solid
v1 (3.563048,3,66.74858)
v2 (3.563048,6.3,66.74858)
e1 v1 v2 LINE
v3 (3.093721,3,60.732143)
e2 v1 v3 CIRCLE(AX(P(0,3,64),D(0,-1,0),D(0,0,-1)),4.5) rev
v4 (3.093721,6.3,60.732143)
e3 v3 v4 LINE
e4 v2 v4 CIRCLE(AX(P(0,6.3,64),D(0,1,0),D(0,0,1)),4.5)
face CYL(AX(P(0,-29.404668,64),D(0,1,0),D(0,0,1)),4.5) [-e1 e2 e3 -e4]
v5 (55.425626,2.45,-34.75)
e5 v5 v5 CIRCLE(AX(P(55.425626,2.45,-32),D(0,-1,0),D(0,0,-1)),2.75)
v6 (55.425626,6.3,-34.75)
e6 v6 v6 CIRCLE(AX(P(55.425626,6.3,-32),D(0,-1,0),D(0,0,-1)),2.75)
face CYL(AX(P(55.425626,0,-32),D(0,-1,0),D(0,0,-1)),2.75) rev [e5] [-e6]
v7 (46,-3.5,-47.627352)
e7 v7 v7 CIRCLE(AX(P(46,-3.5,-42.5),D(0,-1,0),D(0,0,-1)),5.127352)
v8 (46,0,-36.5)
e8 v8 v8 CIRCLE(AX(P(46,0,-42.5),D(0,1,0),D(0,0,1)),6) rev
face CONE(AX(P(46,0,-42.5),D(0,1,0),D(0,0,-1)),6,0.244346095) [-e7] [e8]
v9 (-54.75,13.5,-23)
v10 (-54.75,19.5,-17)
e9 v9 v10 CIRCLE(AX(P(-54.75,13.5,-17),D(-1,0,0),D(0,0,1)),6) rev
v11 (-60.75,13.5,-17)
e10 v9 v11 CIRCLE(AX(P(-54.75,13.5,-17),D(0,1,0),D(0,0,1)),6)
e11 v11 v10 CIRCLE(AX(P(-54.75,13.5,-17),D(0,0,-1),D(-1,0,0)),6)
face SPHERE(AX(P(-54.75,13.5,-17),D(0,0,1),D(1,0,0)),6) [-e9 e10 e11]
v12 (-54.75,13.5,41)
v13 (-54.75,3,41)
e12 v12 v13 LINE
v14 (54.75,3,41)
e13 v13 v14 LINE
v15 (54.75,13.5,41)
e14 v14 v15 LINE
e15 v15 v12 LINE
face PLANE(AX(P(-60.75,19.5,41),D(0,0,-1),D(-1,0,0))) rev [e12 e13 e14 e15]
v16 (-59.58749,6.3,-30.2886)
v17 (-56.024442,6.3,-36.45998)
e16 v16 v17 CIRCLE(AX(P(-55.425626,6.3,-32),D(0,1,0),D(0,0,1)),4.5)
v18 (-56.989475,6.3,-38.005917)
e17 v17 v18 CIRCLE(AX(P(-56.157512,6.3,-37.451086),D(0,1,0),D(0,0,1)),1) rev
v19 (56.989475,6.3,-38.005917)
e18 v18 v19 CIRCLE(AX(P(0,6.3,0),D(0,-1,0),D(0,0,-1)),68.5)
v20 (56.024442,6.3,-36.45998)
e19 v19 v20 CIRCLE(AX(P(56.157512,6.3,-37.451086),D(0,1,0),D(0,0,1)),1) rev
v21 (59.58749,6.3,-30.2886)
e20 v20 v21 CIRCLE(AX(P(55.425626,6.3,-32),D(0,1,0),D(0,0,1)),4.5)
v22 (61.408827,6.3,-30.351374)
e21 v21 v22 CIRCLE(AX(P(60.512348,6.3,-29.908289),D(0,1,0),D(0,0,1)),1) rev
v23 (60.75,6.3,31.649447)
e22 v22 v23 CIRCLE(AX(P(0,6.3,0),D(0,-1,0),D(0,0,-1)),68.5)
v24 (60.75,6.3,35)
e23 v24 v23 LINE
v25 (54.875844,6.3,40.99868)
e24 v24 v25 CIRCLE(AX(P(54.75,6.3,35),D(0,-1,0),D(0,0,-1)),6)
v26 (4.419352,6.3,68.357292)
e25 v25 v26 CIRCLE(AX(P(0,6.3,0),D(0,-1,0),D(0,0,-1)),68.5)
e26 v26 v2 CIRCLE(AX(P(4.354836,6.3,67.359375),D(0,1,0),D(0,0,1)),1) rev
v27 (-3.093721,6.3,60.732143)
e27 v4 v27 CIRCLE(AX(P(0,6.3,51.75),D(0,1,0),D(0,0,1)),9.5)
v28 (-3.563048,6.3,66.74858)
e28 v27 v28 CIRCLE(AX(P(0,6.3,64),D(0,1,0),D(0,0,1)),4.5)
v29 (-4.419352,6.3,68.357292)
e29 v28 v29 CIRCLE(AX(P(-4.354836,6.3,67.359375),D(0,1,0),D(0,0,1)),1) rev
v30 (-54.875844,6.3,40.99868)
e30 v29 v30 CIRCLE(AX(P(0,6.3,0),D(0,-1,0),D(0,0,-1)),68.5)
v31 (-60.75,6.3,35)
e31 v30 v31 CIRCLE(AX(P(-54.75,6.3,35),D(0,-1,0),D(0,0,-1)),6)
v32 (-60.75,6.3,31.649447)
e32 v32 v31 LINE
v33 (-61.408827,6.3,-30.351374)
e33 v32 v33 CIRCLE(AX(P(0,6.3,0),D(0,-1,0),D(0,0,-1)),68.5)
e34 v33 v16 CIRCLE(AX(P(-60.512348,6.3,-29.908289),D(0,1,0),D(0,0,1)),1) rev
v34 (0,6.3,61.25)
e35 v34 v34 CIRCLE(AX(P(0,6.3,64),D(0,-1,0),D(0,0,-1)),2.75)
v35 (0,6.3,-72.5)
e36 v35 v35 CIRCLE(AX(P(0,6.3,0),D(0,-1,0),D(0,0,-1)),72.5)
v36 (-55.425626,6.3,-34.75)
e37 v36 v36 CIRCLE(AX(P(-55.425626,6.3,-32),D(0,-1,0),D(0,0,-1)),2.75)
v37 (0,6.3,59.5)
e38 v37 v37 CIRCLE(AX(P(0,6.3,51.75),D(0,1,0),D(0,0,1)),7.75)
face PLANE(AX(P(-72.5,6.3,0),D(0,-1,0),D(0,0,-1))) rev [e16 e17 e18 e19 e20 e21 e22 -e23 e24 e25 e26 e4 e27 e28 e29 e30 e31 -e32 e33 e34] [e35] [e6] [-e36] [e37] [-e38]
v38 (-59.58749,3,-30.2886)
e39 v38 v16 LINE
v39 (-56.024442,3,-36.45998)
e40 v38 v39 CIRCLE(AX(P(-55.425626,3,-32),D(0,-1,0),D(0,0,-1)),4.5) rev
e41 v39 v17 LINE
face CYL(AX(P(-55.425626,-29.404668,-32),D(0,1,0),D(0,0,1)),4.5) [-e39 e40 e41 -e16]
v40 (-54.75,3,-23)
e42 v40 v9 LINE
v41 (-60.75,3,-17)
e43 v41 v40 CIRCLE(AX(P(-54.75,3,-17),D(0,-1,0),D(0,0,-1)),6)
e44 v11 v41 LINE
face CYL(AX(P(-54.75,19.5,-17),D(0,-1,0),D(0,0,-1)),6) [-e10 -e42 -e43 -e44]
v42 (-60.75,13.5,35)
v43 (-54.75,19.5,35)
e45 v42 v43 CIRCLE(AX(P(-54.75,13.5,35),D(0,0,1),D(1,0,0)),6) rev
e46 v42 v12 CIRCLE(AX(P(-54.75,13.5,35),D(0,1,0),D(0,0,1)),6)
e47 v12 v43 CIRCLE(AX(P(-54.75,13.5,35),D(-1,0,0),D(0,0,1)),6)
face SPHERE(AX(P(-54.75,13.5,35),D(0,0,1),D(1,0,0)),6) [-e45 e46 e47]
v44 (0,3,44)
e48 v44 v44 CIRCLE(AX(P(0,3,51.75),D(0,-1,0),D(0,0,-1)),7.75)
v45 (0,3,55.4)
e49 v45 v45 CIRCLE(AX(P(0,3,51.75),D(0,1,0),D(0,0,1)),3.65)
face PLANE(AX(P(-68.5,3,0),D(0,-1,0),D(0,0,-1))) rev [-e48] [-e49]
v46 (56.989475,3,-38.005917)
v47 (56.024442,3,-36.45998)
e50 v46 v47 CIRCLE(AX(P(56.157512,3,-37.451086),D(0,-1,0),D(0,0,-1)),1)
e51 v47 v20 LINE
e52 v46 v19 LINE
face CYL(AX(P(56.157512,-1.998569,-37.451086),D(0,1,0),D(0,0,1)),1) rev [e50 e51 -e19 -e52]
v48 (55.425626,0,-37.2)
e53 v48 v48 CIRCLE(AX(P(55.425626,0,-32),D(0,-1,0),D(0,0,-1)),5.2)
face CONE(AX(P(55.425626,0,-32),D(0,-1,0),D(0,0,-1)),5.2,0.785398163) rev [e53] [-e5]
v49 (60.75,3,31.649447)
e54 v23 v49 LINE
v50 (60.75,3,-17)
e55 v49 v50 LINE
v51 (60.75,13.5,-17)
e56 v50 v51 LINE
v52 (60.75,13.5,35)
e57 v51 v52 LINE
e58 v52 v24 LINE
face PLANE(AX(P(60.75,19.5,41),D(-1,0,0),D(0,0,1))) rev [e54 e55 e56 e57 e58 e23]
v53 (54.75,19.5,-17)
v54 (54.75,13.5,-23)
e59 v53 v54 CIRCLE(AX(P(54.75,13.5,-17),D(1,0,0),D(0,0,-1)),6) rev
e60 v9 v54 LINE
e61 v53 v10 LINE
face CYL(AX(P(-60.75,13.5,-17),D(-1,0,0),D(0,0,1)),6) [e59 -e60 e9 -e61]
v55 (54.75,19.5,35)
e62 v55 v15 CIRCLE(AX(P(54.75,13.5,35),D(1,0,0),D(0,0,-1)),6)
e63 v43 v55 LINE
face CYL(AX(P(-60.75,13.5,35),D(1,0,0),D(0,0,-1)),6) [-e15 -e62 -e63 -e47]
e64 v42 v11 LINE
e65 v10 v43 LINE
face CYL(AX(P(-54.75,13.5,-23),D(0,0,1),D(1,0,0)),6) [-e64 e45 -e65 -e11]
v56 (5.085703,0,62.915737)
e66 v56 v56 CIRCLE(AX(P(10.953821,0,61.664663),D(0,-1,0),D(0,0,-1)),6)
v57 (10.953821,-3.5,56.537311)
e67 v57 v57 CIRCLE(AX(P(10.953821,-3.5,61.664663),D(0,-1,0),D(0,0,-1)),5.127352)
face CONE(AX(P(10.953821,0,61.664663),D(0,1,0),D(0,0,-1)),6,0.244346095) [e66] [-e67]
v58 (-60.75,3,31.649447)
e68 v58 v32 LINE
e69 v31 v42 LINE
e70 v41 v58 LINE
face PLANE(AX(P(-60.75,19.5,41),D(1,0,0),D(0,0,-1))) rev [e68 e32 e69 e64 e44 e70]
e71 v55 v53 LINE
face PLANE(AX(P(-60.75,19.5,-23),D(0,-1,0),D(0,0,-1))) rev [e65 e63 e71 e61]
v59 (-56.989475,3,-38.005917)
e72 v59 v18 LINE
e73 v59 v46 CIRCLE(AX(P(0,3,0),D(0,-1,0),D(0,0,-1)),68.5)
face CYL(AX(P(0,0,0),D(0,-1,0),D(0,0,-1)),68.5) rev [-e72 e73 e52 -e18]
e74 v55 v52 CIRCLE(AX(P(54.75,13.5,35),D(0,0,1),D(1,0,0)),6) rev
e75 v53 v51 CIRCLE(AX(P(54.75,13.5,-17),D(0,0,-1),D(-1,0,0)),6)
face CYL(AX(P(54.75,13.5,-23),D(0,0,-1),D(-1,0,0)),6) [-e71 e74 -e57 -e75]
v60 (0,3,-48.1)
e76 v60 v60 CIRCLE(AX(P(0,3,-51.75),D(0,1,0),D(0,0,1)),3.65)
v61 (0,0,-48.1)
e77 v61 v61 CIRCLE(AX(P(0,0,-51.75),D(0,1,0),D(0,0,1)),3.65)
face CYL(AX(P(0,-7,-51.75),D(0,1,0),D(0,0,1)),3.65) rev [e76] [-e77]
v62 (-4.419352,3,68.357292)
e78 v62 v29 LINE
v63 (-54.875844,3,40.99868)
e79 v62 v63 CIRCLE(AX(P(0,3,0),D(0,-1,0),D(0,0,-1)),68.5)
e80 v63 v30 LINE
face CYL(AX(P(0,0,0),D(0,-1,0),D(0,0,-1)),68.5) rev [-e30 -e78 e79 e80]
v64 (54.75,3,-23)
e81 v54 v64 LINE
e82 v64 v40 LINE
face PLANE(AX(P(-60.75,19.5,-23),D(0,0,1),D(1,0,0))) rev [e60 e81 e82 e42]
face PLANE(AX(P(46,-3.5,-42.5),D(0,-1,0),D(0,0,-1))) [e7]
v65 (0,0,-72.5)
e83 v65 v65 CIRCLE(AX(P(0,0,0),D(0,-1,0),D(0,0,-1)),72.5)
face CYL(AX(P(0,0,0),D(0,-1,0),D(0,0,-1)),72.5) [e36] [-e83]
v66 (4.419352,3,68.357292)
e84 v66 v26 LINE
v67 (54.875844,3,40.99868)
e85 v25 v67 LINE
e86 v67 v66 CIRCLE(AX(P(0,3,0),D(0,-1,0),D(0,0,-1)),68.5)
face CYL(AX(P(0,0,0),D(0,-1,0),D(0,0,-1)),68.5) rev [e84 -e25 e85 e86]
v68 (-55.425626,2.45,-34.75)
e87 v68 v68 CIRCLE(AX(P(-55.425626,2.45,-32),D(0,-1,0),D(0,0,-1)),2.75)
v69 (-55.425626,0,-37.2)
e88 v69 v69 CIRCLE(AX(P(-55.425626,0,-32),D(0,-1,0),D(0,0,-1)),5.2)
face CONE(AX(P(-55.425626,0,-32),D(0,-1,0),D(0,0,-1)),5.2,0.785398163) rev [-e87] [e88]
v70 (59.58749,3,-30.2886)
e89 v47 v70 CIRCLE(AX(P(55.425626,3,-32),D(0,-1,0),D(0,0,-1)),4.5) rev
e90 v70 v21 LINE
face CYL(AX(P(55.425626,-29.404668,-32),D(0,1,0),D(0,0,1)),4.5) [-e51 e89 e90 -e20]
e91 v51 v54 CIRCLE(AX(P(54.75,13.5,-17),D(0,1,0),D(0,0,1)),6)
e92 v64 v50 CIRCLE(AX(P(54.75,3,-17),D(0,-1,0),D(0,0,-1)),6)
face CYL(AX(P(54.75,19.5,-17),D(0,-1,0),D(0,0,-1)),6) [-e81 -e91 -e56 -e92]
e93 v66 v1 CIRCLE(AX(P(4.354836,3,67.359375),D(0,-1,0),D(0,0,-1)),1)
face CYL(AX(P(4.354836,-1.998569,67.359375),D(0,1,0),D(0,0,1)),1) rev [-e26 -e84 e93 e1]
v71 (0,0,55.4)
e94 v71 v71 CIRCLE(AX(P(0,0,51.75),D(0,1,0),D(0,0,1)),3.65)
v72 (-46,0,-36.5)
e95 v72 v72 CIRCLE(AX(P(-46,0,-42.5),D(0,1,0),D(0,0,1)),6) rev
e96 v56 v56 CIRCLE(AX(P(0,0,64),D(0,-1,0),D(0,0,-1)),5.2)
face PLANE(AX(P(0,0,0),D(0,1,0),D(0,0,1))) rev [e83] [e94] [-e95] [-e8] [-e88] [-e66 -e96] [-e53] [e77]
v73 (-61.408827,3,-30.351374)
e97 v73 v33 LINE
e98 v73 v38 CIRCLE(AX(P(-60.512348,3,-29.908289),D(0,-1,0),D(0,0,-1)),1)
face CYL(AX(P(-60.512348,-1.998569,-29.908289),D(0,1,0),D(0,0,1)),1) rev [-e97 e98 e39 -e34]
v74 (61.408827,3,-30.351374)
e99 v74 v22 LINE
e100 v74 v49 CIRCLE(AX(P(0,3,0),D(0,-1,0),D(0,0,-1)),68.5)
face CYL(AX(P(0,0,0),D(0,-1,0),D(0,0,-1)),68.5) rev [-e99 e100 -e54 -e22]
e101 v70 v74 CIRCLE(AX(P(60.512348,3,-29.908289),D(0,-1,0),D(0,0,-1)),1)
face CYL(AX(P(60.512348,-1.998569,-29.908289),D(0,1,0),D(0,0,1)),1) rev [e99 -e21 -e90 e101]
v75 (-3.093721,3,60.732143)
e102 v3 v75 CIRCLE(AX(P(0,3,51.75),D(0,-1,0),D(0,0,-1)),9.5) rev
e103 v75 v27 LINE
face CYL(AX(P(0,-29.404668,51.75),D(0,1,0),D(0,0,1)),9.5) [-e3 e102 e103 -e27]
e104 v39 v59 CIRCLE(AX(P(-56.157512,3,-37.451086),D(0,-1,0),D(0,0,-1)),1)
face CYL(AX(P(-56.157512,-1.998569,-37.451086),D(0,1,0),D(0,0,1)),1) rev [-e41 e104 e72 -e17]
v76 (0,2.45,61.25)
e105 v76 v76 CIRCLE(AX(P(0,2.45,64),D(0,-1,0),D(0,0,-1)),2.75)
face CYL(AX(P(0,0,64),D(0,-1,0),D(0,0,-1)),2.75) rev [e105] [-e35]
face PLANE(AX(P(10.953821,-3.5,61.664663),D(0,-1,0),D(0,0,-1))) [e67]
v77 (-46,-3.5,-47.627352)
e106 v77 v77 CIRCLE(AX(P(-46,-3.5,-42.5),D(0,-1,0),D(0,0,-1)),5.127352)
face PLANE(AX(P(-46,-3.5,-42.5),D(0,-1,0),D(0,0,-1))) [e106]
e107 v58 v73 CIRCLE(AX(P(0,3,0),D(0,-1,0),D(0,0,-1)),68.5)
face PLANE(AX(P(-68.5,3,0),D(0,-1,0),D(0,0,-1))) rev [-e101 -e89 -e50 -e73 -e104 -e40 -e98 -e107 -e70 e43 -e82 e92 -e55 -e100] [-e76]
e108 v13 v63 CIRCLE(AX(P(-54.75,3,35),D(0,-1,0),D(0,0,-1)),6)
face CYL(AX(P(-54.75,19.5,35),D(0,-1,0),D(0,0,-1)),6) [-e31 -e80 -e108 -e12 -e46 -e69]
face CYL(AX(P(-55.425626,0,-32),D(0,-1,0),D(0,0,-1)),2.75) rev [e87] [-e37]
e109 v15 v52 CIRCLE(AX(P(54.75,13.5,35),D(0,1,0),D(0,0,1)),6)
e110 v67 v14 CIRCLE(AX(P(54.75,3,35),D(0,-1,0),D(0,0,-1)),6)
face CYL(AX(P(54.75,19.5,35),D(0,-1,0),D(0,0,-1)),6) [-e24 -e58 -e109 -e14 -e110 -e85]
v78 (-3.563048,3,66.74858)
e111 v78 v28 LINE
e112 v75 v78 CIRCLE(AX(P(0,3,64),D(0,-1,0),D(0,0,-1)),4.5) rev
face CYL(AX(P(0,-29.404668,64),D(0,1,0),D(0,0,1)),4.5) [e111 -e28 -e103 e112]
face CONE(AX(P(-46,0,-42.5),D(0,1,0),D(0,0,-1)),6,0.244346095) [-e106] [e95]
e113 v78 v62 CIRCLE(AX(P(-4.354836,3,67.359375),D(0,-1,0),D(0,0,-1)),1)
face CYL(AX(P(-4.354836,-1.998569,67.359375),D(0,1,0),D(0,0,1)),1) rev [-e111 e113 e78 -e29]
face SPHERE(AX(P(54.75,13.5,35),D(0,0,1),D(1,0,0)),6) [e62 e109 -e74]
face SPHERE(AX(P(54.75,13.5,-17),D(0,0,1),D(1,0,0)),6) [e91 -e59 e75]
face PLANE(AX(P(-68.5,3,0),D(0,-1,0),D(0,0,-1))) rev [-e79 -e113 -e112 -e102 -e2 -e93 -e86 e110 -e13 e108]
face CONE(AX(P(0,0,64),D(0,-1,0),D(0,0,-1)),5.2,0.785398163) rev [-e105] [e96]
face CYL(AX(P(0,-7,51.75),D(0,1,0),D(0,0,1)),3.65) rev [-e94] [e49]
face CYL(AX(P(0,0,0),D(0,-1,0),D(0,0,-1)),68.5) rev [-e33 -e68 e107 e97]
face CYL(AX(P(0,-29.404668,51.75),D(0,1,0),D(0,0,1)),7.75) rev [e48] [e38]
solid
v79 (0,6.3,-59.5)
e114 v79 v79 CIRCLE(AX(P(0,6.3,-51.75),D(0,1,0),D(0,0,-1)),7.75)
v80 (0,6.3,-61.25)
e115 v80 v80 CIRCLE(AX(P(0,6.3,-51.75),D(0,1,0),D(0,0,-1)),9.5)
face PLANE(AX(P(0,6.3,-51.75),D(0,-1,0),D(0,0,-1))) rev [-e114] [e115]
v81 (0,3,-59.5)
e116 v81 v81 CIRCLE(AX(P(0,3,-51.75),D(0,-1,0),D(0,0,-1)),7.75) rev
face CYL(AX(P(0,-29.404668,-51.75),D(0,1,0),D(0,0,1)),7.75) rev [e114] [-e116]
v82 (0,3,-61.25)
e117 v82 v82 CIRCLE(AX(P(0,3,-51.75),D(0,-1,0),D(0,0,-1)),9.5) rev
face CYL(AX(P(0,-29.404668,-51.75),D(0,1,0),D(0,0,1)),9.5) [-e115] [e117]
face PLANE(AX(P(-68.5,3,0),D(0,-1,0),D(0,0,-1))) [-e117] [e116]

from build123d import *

# Parameters (mm, degrees)
ESQUISSE2_W                                 = 121.5
ESQUISSE2_H                                 = 64
BOSS_EXTRU_1_DEPTH                          = 16.5
CONG_1_R                                    = 6
ESQUISSE3_R                                 = 4.5
BOSS_EXTRU_4_DEPTH                          = 3.3
BOSS_EXTRU_4_2_DEPTH                        = 3.3
ESQUISSE3_R_2                               = 9.5
ESQUISSE3_R_3                               = 7.75
BOSS_EXTRU_4_3_DEPTH                        = 3.3
BOSS_EXTRU_4_4_DEPTH                        = 3.3
BOSS_EXTRU_5_START                          = -3.3
BOSS_EXTRU_5_DEPTH                          = 3.3
ESQUISSE5_R                                 = 3.65
ENL_V_MAT_EXTRU_1_DEPTH                     = 10
FRAISAGE_POUR_VIS_T_TE_FRAIS_E_M51_AT_COUNT = 2
FRAISAGE_POUR_VIS_T_TE_FRAIS_E_M51_AT_PITCH = 110.851251684
FRAISAGE_POUR_VIS_T_TE_FRAIS_E_M51_2_COUNT  = 2
FRAISAGE_POUR_VIS_T_TE_FRAIS_E_M51_2_PITCH  = 110.851251684
ESQUISSE8_R                                 = 6
BOSS_EXTRU_6_DEPTH                          = 3.5
BOSS_EXTRU_6_DRAFT                          = 14
BOSS_EXTRU_6_PROFILE_2_DEPTH                = 3.5
BOSS_EXTRU_6_PROFILE_2_DRAFT                = 14
BOSS_EXTRU_6_PROFILE_3_DEPTH                = 3.5
BOSS_EXTRU_6_PROFILE_3_DRAFT                = 14


with BuildPart() as part:
    # Esquisse1 → Révolution1 (revolve)
    with BuildSketch(Plane.XY, mode=Mode.PRIVATE) as r_volution1_sk:
        Polygon((0, 0), (-72.5, 0), (-72.5, 6.3), (-68.5, 6.3), (-68.5, 3), (0, 3), align=None)
    revolve(r_volution1_sk.sketch.rotate(Axis((0, 0, 0), (0, 1, 0)), 270), axis=Axis((0, 0, 0), (0, 1, 0)))

    # Esquisse2 → Boss.-Extru.1 (add)
    with BuildSketch(Plane(origin=(0, 3, 0), x_dir=(1, 0, 0), z_dir=(0, 1, 0))):
        with Locations((0, -9)):
            Rectangle(ESQUISSE2_W, ESQUISSE2_H)
    extrude(amount=BOSS_EXTRU_1_DEPTH)

    # Congé1
    # the kernel refuses this fillet: 6 mm, written as the material it takes off along each edge
    with BuildSketch(Plane(origin=(54.75, 13.5, -17), x_dir=(0, 1, 0), z_dir=(1, 0, 0))) as cong_1_piece_1_section:
        Polygon((0, 0), (CONG_1_R * 1.02, 0), (CONG_1_R * 1.02, -CONG_1_R * 1.02), (0, -CONG_1_R * 1.02), align=None)
    cong_1_piece_1 = extrude(amount=CONG_1_R * 1.02, mode=Mode.PRIVATE)
    cong_1_piece_1 = cong_1_piece_1 - Plane(origin=(54.75, 13.5, -17), x_dir=(0, -0.7071067811865475, 0.7071067811865475), z_dir=(1, 0, 0)) * Sphere(CONG_1_R, mode=Mode.PRIVATE)
    add(cong_1_piece_1, mode=Mode.SUBTRACT)
    with BuildSketch(Plane(origin=(-54.75, 13.5, -17), x_dir=(0, 0, -1), z_dir=(0, 1, 0))) as cong_1_piece_2_section:
        Polygon((0, 0), (CONG_1_R * 1.02, 0), (CONG_1_R * 1.02, CONG_1_R * 1.02), (0, CONG_1_R * 1.02), align=None)
    cong_1_piece_2 = extrude(amount=CONG_1_R * 1.02, mode=Mode.PRIVATE)
    cong_1_piece_2 = cong_1_piece_2 - Plane(origin=(-54.75, 13.5, -17), x_dir=(0.7071067811865475, 0, 0.7071067811865475), z_dir=(0, 1, 0)) * Sphere(CONG_1_R, mode=Mode.PRIVATE)
    add(cong_1_piece_2, mode=Mode.SUBTRACT)
    with BuildSketch(Plane(origin=(54.75, 13.5, 35), x_dir=(1, 0, 0), z_dir=(0, 0, 1))) as cong_1_piece_3_section:
        Polygon((0, 0), (CONG_1_R * 1.02, 0), (CONG_1_R * 1.02, CONG_1_R * 1.02), (0, CONG_1_R * 1.02), align=None)
    cong_1_piece_3 = extrude(amount=CONG_1_R * 1.02, mode=Mode.PRIVATE)
    cong_1_piece_3 = cong_1_piece_3 - Plane(origin=(54.75, 13.5, 35), x_dir=(-0.7071067811865475, -0.7071067811865475, 0), z_dir=(0, 0, 1)) * Sphere(CONG_1_R, mode=Mode.PRIVATE)
    add(cong_1_piece_3, mode=Mode.SUBTRACT)
    with BuildSketch(Plane(origin=(-54.75, 13.5, 35), x_dir=(0, 1, 0), z_dir=(0, 0, 1))) as cong_1_piece_4_section:
        Polygon((0, 0), (CONG_1_R * 1.02, 0), (CONG_1_R * 1.02, CONG_1_R * 1.02), (0, CONG_1_R * 1.02), align=None)
    cong_1_piece_4 = extrude(amount=CONG_1_R * 1.02, mode=Mode.PRIVATE)
    cong_1_piece_4 = cong_1_piece_4 - Plane(origin=(-54.75, 13.5, 35), x_dir=(0.7071067811865475, -0.7071067811865475, 0), z_dir=(0, 0, 1)) * Sphere(CONG_1_R, mode=Mode.PRIVATE)
    add(cong_1_piece_4, mode=Mode.SUBTRACT)
    with BuildSketch(Plane(origin=(54.75, 19.5, -23), x_dir=(0, 0, 1), z_dir=(-1, 0, 0)), Plane(origin=(-54.75, 19.5, 41), x_dir=(0, 0, -1), z_dir=(1, 0, 0))) as cong_1_piece_5:
        with BuildLine():
            CenterArc((CONG_1_R, -CONG_1_R), CONG_1_R, 90, 90)
            Line((0, -CONG_1_R), (0, 0))
            Line((0, 0), (CONG_1_R, 0))
        make_face()
    extrude(amount=109.5, mode=Mode.SUBTRACT)
    with BuildSketch(Plane(origin=(60.75, 19.5, 35), x_dir=(0, -1, 0), z_dir=(0, 0, -1))) as cong_1_piece_6:
        with BuildLine():
            CenterArc((CONG_1_R, CONG_1_R), CONG_1_R, 180, 90)
            Line((0, CONG_1_R), (0, 0))
            Line((0, 0), (CONG_1_R, 0))
        make_face()
    extrude(amount=52, mode=Mode.SUBTRACT)
    with BuildSketch(Plane(origin=(-60.75, 19.5, -17), x_dir=(1, 0, 0), z_dir=(0, 0, 1))) as cong_1_piece_7:
        with BuildLine():
            CenterArc((CONG_1_R, -CONG_1_R), CONG_1_R, 90, 90)
            Line((0, -CONG_1_R), (0, 0))
            Line((0, 0), (CONG_1_R, 0))
        make_face()
    extrude(amount=52, mode=Mode.SUBTRACT)
    with BuildSketch(Plane(origin=(60.75, 3, 41), x_dir=(0, 0, -1), z_dir=(0, 1, 0))) as cong_1_piece_8_section:
        with BuildLine():
            CenterArc((CONG_1_R, CONG_1_R), CONG_1_R, 180, 90)
            Line((0, CONG_1_R), (0, 0))
            Line((0, 0), (CONG_1_R, 0))
        make_face()
    cong_1_piece_8 = extrude(amount=10.5, mode=Mode.PRIVATE)
    cong_1_piece_8 = cong_1_piece_8 & Plane(origin=(0, 4.65, 0), x_dir=(0, 0, -1), z_dir=(0, -1, 0)) * Cylinder(68.5, 45, mode=Mode.PRIVATE)
    add(cong_1_piece_8, mode=Mode.SUBTRACT)
    with BuildSketch(Plane(origin=(60.75, -12, 41), x_dir=(0, 0, -1), z_dir=(0, 1, 0))) as cong_1_piece_9_section:
        with BuildLine():
            CenterArc((CONG_1_R, CONG_1_R), CONG_1_R, 180, 90)
            Line((0, CONG_1_R), (0, 0))
            Line((0, 0), (CONG_1_R, 0))
        make_face()
    cong_1_piece_9 = extrude(amount=25.5, mode=Mode.PRIVATE)
    cong_1_piece_9 = split(cong_1_piece_9, bisect_by=Plane(origin=(59.311330045, 6.3, 39.576455151), z_dir=(0, 1, 0)), keep=Keep.TOP, mode=Mode.PRIVATE)
    add(cong_1_piece_9, mode=Mode.SUBTRACT)
    with BuildSketch(Plane(origin=(60.75, -12, 41), x_dir=(0, 0, -1), z_dir=(0, 1, 0))) as cong_1_piece_10_section:
        with BuildLine():
            CenterArc((CONG_1_R, CONG_1_R), CONG_1_R, 180, 90)
            Line((0, CONG_1_R), (0, 0))
            Line((0, 0), (CONG_1_R, 0))
        make_face()
    cong_1_piece_10 = extrude(amount=25.5, mode=Mode.PRIVATE)
    cong_1_piece_10 = cong_1_piece_10 - Plane(origin=(0, 4.65, 0), x_dir=(0, 0, -1), z_dir=(0, 1, 0)) * Cylinder(72.5, 75, mode=Mode.PRIVATE)
    add(cong_1_piece_10, mode=Mode.SUBTRACT)
    with BuildSketch(Plane(origin=(60.75, 3, -23), x_dir=(0, 0, 1), z_dir=(0, 1, 0)), Plane(origin=(-60.75, 3, -23), x_dir=(1, 0, 0), z_dir=(0, 1, 0))) as cong_1_piece_11:
        with BuildLine():
            CenterArc((CONG_1_R, -CONG_1_R), CONG_1_R, 90, 90)
            Line((0, -CONG_1_R), (0, 0))
            Line((0, 0), (CONG_1_R, 0))
        make_face()
    extrude(amount=10.5, mode=Mode.SUBTRACT)
    with BuildSketch(Plane(origin=(-60.75, 3, 41), x_dir=(1, 0, 0), z_dir=(0, 1, 0))) as cong_1_piece_12_section:
        with BuildLine():
            CenterArc((CONG_1_R, CONG_1_R), CONG_1_R, 180, 90)
            Line((0, CONG_1_R), (0, 0))
            Line((0, 0), (CONG_1_R, 0))
        make_face()
    cong_1_piece_12 = extrude(amount=10.5, mode=Mode.PRIVATE)
    cong_1_piece_12 = cong_1_piece_12 & Plane(origin=(0, 4.65, 0), x_dir=(0, 0, -1), z_dir=(0, -1, 0)) * Cylinder(68.5, 45, mode=Mode.PRIVATE)
    add(cong_1_piece_12, mode=Mode.SUBTRACT)
    with BuildSketch(Plane(origin=(-60.75, -12, 41), x_dir=(1, 0, 0), z_dir=(0, 1, 0))) as cong_1_piece_13_section:
        with BuildLine():
            CenterArc((CONG_1_R, CONG_1_R), CONG_1_R, 180, 90)
            Line((0, CONG_1_R), (0, 0))
            Line((0, 0), (CONG_1_R, 0))
        make_face()
    cong_1_piece_13 = extrude(amount=25.5, mode=Mode.PRIVATE)
    cong_1_piece_13 = split(cong_1_piece_13, bisect_by=Plane(origin=(-59.311330045, 6.3, 39.576455151), z_dir=(0, 1, 0)), keep=Keep.TOP, mode=Mode.PRIVATE)
    add(cong_1_piece_13, mode=Mode.SUBTRACT)
    with BuildSketch(Plane(origin=(-60.75, -12, 41), x_dir=(1, 0, 0), z_dir=(0, 1, 0))) as cong_1_piece_14_section:
        with BuildLine():
            CenterArc((CONG_1_R, CONG_1_R), CONG_1_R, 180, 90)
            Line((0, CONG_1_R), (0, 0))
            Line((0, 0), (CONG_1_R, 0))
        make_face()
    cong_1_piece_14 = extrude(amount=25.5, mode=Mode.PRIVATE)
    cong_1_piece_14 = cong_1_piece_14 - Plane(origin=(0, 4.65, 0), x_dir=(0, 0, -1), z_dir=(0, 1, 0)) * Cylinder(72.5, 75, mode=Mode.PRIVATE)
    add(cong_1_piece_14, mode=Mode.SUBTRACT)



with BuildPart() as body_2:
    # Esquisse3 → Boss.-Extru.4 (new body)
    with BuildSketch(Plane(origin=(0, 6.3, 0), x_dir=(1, 0, 0), z_dir=(0, 1, 0))):
        with Locations(Location((-55.425625842, 32, 0), (0, 0, 270))):
            Circle(ESQUISSE3_R)
    extrude(amount=-BOSS_EXTRU_4_DEPTH)


with BuildPart() as body_3:
    # Esquisse3 → Boss.-Extru.4 2 (new body)
    with BuildSketch(Plane(origin=(0, 6.3, 0), x_dir=(1, 0, 0), z_dir=(0, 1, 0))):
        with Locations(Location((55.425625842, 32, 0), (0, 0, 270))):
            Circle(ESQUISSE3_R)
    extrude(amount=-BOSS_EXTRU_4_2_DEPTH)


with BuildPart() as body_4:
    # Esquisse3 → Boss.-Extru.4 3 (new body)
    with BuildSketch(Plane(origin=(0, 6.3, 0), x_dir=(1, 0, 0), z_dir=(0, 1, 0))):
        with Locations(Location((0, 51.75, 0), (0, 0, 90))):
            Circle(ESQUISSE3_R_2)
        with Locations(Location((0, 51.75, 0), (0, 0, 90))):
            Circle(ESQUISSE3_R_3, mode=Mode.SUBTRACT)
    extrude(amount=-BOSS_EXTRU_4_3_DEPTH)


with BuildPart() as body_5:
    # Esquisse3 → Boss.-Extru.4 4 (new body)
    with BuildSketch(Plane(origin=(0, 6.3, 0), x_dir=(1, 0, 0), z_dir=(0, 1, 0))):
        with BuildLine():
            ThreePointArc((-3.093721011, -60.732142857), (0, -68.5), (3.093721011, -60.732142857))
            ThreePointArc((3.093721011, -60.732142857), (0, -42.25), (-3.093721011, -60.732142857))
        make_face()
        with Locations(Location((0, -51.75, 0), (0, 0, 270))):
            Circle(ESQUISSE3_R_3, mode=Mode.SUBTRACT)
    extrude(amount=-BOSS_EXTRU_4_4_DEPTH)


with BuildPart() as part_1:
    add(part.part)

    add(body_2.part)  # Boss.-Extru.5 merges body 2

    add(body_3.part)  # Boss.-Extru.5 merges body 3

    add(body_5.part)  # Boss.-Extru.5 merges body 5
    # Esquisse4 → Boss.-Extru.5 (add)
    with BuildSketch(Plane(origin=(0, 6.3, 0), x_dir=(1, 0, 0), z_dir=(0, 1, 0)).offset(BOSS_EXTRU_5_START)):
        with BuildLine():
            ThreePointArc((-59.322739983, 34.250000305), (-57.930490853, 35.738402236), (-56.024441593, 36.459979787))
            ThreePointArc((-56.024441593, 36.459979787), (-57.005800364, 36.92155223), (-56.989474897, 38.005917316))
            ThreePointArc((-56.989474897, 38.005917316), (-58.186420759, 36.146790166), (-59.322739983, 34.250000305))
        make_face()
        with BuildLine():
            ThreePointArc((-59.587489513, 30.288599759), (-59.91560963, 32.300075966), (-59.322739983, 34.250000305))
            ThreePointArc((-59.322739983, 34.250000305), (-60.397248762, 32.31752376), (-61.408827338, 30.351374351))
            ThreePointArc((-61.408827338, 30.351374351), (-60.477902361, 30.907695163), (-59.587489513, 30.288599759))
        make_face()
        with BuildLine():
            ThreePointArc((56.024441593, 36.459979787), (57.930491108, 35.738402065), (59.32274029, 34.249999774))
            ThreePointArc((59.32274029, 34.249999774), (58.18642092, 36.146789906), (56.989474897, 38.005917316))
            ThreePointArc((56.989474897, 38.005917316), (57.005800364, 36.92155223), (56.024441593, 36.459979787))
        make_face()
        with BuildLine():
            ThreePointArc((59.32274029, 34.249999774), (59.91560965, 32.300075661), (59.587489513, 30.288599759))
            ThreePointArc((59.587489513, 30.288599759), (60.477902361, 30.907695163), (61.408827338, 30.351374351))
            ThreePointArc((61.408827338, 30.351374351), (60.397248907, 32.31752349), (59.32274029, 34.249999774))
        make_face()
        with BuildLine():
            ThreePointArc((-3.56304792, -66.748579545), (-3.472101996, -67.829247394), (-4.419352441, -68.357291667))
            ThreePointArc((-4.419352441, -68.357291667), (-2.210827995, -68.464313621), (-2e-09, -68.5))
            ThreePointArc((-2e-09, -68.5), (-1.985118643, -68.038477928), (-3.56304792, -66.748579545))
        make_face()
        with BuildLine():
            ThreePointArc((3.56304792, -66.748579545), (1.985118641, -68.038477929), (-2e-09, -68.5))
            ThreePointArc((-2e-09, -68.5), (2.210827992, -68.464313621), (4.419352441, -68.357291667))
            ThreePointArc((4.419352441, -68.357291667), (3.472101996, -67.829247394), (3.56304792, -66.748579545))
        make_face()
    extrude(amount=BOSS_EXTRU_5_DEPTH)

    # Esquisse5 → Enlèv. mat.-Extru.1 (cut)
    with BuildSketch(Plane(origin=(0, 3, 0), x_dir=(1, 0, 0), z_dir=(0, 1, 0))):
        with Locations(Location((0, -51.75, 0), (0, 0, 270))):
            Circle(ESQUISSE5_R)
        with Locations(Location((0, 51.75, 0), (0, 0, 270))):
            Circle(ESQUISSE5_R)
    extrude(amount=-ENL_V_MAT_EXTRU_1_DEPTH, mode=Mode.SUBTRACT)

    # Esquisse6 → Fraisage pour vis à tête fraisée M51 (revolve, cut)
    with BuildSketch(Plane(origin=(0, 0, 64), x_dir=(0, 0, -1), z_dir=(1, 0, 0))):
        Polygon((0, 0), (0, 19.5), (2.75, 19.5), (2.75, 2.45), (5.2, 0), align=None)
    fraisage_pour_vis_t_te_frais_e_m51 = revolve(axis=Axis((0, -6.35, 64), (0, 1, 0)), mode=Mode.SUBTRACT)

    # Fraisage pour vis à tête fraisée M51 at: Fraisage pour vis à tête fraisée M51 ×2
    with Locations(*[Vector(0.5000000000000041, 0, -0.8660254037844364) * (i * FRAISAGE_POUR_VIS_T_TE_FRAIS_E_M51_AT_PITCH) for i in range(1, FRAISAGE_POUR_VIS_T_TE_FRAIS_E_M51_AT_COUNT)]):
        add(fraisage_pour_vis_t_te_frais_e_m51, mode=Mode.SUBTRACT)

    # Fraisage pour vis _ t_te frais_e M51 2: Fraisage pour vis à tête fraisée M51 ×2
    with Locations(*[Vector(-0.49999999999999806, 0, -0.8660254037844398) * (i * FRAISAGE_POUR_VIS_T_TE_FRAIS_E_M51_2_PITCH) for i in range(1, FRAISAGE_POUR_VIS_T_TE_FRAIS_E_M51_2_COUNT)]):
        add(fraisage_pour_vis_t_te_frais_e_m51, mode=Mode.SUBTRACT)


with BuildPart() as boss_extru_6_tool:
    # Esquisse8 → Boss.-Extru.6 (with draft: the straight prism first)
    with BuildSketch(Plane.XZ):
        with Locations((-46, -42.5)):
            Circle(ESQUISSE8_R)
    extrude(amount=BOSS_EXTRU_6_DEPTH)
    # Boss.-Extru.6: the draft: its side faces are tilted about the plane it starts from
    boss_extru_6_sides = [boss_extru_6_tool.faces().sort_by_distance(p)[0] for p in [
        (-52, -1.75, -42.5),
    ]]
    draft(boss_extru_6_sides, Plane.XZ, BOSS_EXTRU_6_DRAFT)


with BuildPart() as part_2:
    add(part_1.part)

    # Boss.-Extru.6: add boss_extru_6_tool
    add(boss_extru_6_tool.part)


with BuildPart() as boss_extru_6_profile_2_tool:
    # Esquisse8 → Boss.-Extru.6 profile 2 (with draft: the straight prism first)
    with BuildSketch(Plane.XZ):
        with Locations((46, -42.5)):
            Circle(ESQUISSE8_R)
    extrude(amount=BOSS_EXTRU_6_PROFILE_2_DEPTH)
    # Boss.-Extru.6 profile 2: the draft: its side faces are tilted about the plane it starts from
    boss_extru_6_profile_2_sides = [boss_extru_6_profile_2_tool.faces().sort_by_distance(p)[0] for p in [
        (40, -1.75, -42.5),
    ]]
    draft(boss_extru_6_profile_2_sides, Plane.XZ, BOSS_EXTRU_6_PROFILE_2_DRAFT)


with BuildPart() as part_3:
    add(part_2.part)

    # Boss.-Extru.6 profile 2: add boss_extru_6_profile_2_tool
    add(boss_extru_6_profile_2_tool.part)


with BuildPart() as boss_extru_6_profile_3_tool:
    # Esquisse8 → Boss.-Extru.6 profile 3 (with draft: the straight prism first)
    with BuildSketch(Plane.XZ):
        with Locations((10.953821361, 61.664663281)):
            Circle(ESQUISSE8_R)
    extrude(amount=BOSS_EXTRU_6_PROFILE_3_DEPTH)
    # Boss.-Extru.6 profile 3: the draft: its side faces are tilted about the plane it starts from
    boss_extru_6_profile_3_sides = [boss_extru_6_profile_3_tool.faces().sort_by_distance(p)[0] for p in [
        (4.953821361, -1.75, 61.664663281),
    ]]
    draft(boss_extru_6_profile_3_sides, Plane.XZ, BOSS_EXTRU_6_PROFILE_3_DRAFT)


with BuildPart() as part_4:
    add(part_3.part)

    # Boss.-Extru.6 profile 3: add boss_extru_6_profile_3_tool
    add(boss_extru_6_profile_3_tool.part)


solid = Compound([body_4.part, part_4.part])
